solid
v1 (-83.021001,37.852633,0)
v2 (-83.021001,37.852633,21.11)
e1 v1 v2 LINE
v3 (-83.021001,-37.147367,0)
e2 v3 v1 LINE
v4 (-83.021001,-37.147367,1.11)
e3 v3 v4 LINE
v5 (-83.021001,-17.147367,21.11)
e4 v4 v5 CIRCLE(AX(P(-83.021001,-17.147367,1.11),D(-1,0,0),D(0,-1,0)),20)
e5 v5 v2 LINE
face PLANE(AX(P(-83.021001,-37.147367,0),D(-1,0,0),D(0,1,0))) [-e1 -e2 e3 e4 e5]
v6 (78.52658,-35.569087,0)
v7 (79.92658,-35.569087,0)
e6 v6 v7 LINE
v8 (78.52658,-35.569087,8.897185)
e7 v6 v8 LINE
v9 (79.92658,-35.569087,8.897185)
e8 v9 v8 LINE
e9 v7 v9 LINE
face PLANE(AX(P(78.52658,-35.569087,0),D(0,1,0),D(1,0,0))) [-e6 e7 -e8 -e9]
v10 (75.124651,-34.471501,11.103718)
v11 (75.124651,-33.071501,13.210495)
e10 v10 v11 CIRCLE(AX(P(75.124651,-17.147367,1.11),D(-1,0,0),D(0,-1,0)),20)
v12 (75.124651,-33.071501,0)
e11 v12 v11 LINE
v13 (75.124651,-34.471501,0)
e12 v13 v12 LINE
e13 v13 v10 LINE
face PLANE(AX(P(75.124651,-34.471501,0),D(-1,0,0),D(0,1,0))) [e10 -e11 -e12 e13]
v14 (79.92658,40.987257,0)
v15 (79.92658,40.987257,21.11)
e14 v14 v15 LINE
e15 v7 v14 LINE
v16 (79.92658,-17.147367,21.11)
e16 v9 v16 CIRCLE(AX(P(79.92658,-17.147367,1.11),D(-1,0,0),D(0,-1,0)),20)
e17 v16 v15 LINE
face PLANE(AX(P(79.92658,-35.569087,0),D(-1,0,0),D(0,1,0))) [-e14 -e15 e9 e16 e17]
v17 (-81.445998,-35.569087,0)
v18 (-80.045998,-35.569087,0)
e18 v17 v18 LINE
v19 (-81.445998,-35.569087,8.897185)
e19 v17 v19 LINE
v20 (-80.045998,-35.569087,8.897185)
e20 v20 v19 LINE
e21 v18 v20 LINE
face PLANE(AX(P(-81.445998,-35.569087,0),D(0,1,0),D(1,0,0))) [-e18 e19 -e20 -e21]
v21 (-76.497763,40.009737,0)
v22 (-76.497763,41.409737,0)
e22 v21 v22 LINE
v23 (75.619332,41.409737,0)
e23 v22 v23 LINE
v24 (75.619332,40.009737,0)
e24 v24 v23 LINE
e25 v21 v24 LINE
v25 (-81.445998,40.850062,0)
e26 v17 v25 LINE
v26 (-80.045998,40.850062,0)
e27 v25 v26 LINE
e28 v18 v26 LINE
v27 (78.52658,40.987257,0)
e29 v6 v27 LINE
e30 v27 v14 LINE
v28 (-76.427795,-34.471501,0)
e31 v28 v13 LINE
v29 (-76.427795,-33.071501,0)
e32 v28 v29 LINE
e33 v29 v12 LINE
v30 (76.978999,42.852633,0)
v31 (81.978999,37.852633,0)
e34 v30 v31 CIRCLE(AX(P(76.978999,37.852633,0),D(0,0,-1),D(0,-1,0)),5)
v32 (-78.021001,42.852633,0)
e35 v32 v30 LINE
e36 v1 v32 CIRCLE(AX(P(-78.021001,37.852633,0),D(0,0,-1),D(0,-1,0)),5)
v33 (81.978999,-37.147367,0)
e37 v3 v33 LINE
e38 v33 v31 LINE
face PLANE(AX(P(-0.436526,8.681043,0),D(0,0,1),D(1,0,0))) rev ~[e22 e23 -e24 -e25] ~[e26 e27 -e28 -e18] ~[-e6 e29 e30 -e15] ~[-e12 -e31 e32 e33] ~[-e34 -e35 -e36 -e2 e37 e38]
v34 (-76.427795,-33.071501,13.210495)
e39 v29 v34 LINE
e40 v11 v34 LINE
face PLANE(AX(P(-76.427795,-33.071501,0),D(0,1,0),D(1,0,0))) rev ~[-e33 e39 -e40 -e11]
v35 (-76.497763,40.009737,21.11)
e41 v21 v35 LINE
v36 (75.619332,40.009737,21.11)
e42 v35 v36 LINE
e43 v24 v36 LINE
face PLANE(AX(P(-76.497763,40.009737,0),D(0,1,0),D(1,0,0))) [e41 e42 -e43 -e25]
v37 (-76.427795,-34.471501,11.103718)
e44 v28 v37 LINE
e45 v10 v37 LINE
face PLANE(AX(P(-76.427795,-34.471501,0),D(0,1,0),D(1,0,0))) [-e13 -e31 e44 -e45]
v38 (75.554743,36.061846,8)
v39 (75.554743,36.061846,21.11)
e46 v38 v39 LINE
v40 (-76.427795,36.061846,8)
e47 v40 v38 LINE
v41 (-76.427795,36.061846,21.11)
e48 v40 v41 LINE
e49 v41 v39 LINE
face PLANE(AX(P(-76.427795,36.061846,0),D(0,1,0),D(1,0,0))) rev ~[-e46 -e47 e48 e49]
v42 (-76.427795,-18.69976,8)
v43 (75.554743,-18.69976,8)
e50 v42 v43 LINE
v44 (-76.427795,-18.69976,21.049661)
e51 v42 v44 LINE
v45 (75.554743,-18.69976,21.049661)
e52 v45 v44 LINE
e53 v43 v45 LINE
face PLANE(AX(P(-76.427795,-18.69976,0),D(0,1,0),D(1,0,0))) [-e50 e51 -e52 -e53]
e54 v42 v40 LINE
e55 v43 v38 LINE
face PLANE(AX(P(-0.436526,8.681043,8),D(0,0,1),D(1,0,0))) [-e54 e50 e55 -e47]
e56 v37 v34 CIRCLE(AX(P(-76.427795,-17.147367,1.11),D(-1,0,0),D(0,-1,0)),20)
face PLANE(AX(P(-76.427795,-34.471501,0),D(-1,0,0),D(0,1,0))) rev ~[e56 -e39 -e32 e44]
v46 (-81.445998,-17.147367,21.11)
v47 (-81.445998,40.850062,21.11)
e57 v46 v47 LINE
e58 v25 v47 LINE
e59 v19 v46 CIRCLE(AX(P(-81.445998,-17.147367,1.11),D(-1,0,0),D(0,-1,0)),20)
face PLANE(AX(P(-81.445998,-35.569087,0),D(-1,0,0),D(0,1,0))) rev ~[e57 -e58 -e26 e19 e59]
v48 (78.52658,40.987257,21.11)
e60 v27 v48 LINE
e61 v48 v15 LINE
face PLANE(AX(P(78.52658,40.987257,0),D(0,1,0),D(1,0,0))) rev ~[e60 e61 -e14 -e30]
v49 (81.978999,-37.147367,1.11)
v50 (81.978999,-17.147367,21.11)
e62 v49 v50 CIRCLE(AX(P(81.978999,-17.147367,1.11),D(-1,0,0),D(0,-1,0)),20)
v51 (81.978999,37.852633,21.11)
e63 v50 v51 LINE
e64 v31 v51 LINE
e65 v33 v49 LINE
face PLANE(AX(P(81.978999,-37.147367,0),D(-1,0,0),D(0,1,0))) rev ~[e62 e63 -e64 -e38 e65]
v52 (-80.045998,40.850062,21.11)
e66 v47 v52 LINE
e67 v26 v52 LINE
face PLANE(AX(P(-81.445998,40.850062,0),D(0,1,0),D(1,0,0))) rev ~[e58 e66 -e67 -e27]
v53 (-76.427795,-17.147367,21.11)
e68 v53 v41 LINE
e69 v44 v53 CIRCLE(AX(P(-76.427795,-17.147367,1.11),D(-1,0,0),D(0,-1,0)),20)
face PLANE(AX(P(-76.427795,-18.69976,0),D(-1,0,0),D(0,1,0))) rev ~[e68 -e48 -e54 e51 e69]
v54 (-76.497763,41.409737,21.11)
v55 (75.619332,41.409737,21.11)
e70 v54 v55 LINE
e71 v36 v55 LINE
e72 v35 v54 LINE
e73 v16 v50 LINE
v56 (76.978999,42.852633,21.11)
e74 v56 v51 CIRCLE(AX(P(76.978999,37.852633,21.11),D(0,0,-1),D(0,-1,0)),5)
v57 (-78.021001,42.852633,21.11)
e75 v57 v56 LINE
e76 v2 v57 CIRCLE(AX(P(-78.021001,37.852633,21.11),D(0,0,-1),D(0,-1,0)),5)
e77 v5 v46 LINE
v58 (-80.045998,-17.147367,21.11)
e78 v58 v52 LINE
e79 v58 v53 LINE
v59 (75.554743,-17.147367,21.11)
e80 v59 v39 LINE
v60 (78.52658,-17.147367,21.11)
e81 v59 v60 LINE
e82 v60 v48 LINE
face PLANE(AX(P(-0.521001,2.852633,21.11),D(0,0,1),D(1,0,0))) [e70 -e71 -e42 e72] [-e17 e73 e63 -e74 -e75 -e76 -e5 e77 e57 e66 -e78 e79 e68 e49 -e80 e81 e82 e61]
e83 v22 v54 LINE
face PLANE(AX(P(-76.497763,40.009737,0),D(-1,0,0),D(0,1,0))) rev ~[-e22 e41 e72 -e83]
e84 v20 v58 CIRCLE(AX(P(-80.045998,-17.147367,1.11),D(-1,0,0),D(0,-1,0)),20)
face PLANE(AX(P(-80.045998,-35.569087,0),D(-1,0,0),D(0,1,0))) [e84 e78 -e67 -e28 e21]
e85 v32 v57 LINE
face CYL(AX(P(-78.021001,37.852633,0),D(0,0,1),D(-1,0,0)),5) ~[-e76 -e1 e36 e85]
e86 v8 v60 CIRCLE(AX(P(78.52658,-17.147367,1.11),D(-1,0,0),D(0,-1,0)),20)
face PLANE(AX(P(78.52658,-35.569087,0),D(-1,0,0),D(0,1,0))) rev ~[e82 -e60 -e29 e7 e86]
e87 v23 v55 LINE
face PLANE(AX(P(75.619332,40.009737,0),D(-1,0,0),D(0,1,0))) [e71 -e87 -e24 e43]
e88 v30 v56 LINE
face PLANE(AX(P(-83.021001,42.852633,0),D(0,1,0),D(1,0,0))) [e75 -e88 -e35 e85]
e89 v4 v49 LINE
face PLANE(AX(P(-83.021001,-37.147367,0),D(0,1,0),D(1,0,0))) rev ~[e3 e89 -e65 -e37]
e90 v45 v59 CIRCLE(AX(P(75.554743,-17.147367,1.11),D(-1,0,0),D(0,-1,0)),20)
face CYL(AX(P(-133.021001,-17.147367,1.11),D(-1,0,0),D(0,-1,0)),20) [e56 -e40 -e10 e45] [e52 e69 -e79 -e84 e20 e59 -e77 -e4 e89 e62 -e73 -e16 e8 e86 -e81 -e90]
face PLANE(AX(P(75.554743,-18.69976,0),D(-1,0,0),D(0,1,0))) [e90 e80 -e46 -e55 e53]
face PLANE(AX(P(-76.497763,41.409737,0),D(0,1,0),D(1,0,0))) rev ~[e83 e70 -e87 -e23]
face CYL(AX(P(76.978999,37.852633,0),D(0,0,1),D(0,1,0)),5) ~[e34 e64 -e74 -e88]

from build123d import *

# Parameters (mm, degrees)
F0_W        = 165
F0_H        = 80
F0_W_2      = 151.5524461865
F0_H_2      = 1.4
F0_W_3      = 1.4
F0_H_3      = 76.4191485941
F0_H_4      = 76.5563435853
F0_W_4      = 151.9825384021
F0_H_5      = 54.7616053373
F0_W_5      = 152.1170958877
F1_DEPTH    = 21.11
F2_T1_DEPTH = 265
F3_DEPTH    = 8
F4_R        = 5


# Not quite as in the source:
# - a fillet or chamfer that OpenCascade refuses, or shapes differently, is made with other operations: its cross-section is extruded or revolved along the edge and cut away or added


with BuildPart() as f1:
    # F0 (on Top) → F1 (new body)
    with BuildSketch(Plane.XY):
        with Locations((-0.5210009217, 2.8526327014)):
            Rectangle(F0_W, F0_H)
        with Locations((-0.6515718997, -33.7715006649)):
            Rectangle(F0_W_2, F0_H_2, mode=Mode.SUBTRACT)
        with Locations((-80.7459980965, 2.6404876262)):
            Rectangle(F0_W_3, F0_H_3, mode=Mode.SUBTRACT)
        with Locations((79.2265801907, 2.7090851218)):
            Rectangle(F0_W_3, F0_H_4, mode=Mode.SUBTRACT)
        with Locations((-0.4365257919, 8.6810430512)):
            Rectangle(F0_W_4, F0_H_5, mode=Mode.SUBTRACT)
        with Locations((-0.4392154515, 40.7097370148)):
            Rectangle(F0_W_5, F0_H_2, mode=Mode.SUBTRACT)
    extrude(amount=F1_DEPTH)

    # F2: fillet of radius 20 on 1 edges, made by hand

    # F2_s2 → F2_t1 (cut)
    with BuildSketch(Plane.YZ.offset(-133.0210009217)):
        with BuildLine():
            ThreePointArc((-37.1473672986, 1.11), (-31.2895029223, 15.2521356237), (-17.1473672986, 21.11))
            Line((-17.1473672986, 21.11), (-37.1473672986, 21.11))
            Line((-37.1473672986, 21.11), (-37.1473672986, 1.11))
        make_face()
    extrude(amount=F2_T1_DEPTH, mode=Mode.SUBTRACT)

    # F0 (on Top) → F3 (join)
    with BuildSketch(Plane.XY):
        with Locations((-0.4365257919, 8.6810430512)):
            Rectangle(F0_W_4, F0_H_5)
    extrude(amount=F3_DEPTH)

    # F4
    f4_edges = [f1.edges().sort_by_distance(p)[0] for p in [
        (-83.021001, 42.852633, 10.555),
        (81.978999, 42.852633, 10.555),
    ]]
    fillet(f4_edges, radius=F4_R)


solid = f1.part
